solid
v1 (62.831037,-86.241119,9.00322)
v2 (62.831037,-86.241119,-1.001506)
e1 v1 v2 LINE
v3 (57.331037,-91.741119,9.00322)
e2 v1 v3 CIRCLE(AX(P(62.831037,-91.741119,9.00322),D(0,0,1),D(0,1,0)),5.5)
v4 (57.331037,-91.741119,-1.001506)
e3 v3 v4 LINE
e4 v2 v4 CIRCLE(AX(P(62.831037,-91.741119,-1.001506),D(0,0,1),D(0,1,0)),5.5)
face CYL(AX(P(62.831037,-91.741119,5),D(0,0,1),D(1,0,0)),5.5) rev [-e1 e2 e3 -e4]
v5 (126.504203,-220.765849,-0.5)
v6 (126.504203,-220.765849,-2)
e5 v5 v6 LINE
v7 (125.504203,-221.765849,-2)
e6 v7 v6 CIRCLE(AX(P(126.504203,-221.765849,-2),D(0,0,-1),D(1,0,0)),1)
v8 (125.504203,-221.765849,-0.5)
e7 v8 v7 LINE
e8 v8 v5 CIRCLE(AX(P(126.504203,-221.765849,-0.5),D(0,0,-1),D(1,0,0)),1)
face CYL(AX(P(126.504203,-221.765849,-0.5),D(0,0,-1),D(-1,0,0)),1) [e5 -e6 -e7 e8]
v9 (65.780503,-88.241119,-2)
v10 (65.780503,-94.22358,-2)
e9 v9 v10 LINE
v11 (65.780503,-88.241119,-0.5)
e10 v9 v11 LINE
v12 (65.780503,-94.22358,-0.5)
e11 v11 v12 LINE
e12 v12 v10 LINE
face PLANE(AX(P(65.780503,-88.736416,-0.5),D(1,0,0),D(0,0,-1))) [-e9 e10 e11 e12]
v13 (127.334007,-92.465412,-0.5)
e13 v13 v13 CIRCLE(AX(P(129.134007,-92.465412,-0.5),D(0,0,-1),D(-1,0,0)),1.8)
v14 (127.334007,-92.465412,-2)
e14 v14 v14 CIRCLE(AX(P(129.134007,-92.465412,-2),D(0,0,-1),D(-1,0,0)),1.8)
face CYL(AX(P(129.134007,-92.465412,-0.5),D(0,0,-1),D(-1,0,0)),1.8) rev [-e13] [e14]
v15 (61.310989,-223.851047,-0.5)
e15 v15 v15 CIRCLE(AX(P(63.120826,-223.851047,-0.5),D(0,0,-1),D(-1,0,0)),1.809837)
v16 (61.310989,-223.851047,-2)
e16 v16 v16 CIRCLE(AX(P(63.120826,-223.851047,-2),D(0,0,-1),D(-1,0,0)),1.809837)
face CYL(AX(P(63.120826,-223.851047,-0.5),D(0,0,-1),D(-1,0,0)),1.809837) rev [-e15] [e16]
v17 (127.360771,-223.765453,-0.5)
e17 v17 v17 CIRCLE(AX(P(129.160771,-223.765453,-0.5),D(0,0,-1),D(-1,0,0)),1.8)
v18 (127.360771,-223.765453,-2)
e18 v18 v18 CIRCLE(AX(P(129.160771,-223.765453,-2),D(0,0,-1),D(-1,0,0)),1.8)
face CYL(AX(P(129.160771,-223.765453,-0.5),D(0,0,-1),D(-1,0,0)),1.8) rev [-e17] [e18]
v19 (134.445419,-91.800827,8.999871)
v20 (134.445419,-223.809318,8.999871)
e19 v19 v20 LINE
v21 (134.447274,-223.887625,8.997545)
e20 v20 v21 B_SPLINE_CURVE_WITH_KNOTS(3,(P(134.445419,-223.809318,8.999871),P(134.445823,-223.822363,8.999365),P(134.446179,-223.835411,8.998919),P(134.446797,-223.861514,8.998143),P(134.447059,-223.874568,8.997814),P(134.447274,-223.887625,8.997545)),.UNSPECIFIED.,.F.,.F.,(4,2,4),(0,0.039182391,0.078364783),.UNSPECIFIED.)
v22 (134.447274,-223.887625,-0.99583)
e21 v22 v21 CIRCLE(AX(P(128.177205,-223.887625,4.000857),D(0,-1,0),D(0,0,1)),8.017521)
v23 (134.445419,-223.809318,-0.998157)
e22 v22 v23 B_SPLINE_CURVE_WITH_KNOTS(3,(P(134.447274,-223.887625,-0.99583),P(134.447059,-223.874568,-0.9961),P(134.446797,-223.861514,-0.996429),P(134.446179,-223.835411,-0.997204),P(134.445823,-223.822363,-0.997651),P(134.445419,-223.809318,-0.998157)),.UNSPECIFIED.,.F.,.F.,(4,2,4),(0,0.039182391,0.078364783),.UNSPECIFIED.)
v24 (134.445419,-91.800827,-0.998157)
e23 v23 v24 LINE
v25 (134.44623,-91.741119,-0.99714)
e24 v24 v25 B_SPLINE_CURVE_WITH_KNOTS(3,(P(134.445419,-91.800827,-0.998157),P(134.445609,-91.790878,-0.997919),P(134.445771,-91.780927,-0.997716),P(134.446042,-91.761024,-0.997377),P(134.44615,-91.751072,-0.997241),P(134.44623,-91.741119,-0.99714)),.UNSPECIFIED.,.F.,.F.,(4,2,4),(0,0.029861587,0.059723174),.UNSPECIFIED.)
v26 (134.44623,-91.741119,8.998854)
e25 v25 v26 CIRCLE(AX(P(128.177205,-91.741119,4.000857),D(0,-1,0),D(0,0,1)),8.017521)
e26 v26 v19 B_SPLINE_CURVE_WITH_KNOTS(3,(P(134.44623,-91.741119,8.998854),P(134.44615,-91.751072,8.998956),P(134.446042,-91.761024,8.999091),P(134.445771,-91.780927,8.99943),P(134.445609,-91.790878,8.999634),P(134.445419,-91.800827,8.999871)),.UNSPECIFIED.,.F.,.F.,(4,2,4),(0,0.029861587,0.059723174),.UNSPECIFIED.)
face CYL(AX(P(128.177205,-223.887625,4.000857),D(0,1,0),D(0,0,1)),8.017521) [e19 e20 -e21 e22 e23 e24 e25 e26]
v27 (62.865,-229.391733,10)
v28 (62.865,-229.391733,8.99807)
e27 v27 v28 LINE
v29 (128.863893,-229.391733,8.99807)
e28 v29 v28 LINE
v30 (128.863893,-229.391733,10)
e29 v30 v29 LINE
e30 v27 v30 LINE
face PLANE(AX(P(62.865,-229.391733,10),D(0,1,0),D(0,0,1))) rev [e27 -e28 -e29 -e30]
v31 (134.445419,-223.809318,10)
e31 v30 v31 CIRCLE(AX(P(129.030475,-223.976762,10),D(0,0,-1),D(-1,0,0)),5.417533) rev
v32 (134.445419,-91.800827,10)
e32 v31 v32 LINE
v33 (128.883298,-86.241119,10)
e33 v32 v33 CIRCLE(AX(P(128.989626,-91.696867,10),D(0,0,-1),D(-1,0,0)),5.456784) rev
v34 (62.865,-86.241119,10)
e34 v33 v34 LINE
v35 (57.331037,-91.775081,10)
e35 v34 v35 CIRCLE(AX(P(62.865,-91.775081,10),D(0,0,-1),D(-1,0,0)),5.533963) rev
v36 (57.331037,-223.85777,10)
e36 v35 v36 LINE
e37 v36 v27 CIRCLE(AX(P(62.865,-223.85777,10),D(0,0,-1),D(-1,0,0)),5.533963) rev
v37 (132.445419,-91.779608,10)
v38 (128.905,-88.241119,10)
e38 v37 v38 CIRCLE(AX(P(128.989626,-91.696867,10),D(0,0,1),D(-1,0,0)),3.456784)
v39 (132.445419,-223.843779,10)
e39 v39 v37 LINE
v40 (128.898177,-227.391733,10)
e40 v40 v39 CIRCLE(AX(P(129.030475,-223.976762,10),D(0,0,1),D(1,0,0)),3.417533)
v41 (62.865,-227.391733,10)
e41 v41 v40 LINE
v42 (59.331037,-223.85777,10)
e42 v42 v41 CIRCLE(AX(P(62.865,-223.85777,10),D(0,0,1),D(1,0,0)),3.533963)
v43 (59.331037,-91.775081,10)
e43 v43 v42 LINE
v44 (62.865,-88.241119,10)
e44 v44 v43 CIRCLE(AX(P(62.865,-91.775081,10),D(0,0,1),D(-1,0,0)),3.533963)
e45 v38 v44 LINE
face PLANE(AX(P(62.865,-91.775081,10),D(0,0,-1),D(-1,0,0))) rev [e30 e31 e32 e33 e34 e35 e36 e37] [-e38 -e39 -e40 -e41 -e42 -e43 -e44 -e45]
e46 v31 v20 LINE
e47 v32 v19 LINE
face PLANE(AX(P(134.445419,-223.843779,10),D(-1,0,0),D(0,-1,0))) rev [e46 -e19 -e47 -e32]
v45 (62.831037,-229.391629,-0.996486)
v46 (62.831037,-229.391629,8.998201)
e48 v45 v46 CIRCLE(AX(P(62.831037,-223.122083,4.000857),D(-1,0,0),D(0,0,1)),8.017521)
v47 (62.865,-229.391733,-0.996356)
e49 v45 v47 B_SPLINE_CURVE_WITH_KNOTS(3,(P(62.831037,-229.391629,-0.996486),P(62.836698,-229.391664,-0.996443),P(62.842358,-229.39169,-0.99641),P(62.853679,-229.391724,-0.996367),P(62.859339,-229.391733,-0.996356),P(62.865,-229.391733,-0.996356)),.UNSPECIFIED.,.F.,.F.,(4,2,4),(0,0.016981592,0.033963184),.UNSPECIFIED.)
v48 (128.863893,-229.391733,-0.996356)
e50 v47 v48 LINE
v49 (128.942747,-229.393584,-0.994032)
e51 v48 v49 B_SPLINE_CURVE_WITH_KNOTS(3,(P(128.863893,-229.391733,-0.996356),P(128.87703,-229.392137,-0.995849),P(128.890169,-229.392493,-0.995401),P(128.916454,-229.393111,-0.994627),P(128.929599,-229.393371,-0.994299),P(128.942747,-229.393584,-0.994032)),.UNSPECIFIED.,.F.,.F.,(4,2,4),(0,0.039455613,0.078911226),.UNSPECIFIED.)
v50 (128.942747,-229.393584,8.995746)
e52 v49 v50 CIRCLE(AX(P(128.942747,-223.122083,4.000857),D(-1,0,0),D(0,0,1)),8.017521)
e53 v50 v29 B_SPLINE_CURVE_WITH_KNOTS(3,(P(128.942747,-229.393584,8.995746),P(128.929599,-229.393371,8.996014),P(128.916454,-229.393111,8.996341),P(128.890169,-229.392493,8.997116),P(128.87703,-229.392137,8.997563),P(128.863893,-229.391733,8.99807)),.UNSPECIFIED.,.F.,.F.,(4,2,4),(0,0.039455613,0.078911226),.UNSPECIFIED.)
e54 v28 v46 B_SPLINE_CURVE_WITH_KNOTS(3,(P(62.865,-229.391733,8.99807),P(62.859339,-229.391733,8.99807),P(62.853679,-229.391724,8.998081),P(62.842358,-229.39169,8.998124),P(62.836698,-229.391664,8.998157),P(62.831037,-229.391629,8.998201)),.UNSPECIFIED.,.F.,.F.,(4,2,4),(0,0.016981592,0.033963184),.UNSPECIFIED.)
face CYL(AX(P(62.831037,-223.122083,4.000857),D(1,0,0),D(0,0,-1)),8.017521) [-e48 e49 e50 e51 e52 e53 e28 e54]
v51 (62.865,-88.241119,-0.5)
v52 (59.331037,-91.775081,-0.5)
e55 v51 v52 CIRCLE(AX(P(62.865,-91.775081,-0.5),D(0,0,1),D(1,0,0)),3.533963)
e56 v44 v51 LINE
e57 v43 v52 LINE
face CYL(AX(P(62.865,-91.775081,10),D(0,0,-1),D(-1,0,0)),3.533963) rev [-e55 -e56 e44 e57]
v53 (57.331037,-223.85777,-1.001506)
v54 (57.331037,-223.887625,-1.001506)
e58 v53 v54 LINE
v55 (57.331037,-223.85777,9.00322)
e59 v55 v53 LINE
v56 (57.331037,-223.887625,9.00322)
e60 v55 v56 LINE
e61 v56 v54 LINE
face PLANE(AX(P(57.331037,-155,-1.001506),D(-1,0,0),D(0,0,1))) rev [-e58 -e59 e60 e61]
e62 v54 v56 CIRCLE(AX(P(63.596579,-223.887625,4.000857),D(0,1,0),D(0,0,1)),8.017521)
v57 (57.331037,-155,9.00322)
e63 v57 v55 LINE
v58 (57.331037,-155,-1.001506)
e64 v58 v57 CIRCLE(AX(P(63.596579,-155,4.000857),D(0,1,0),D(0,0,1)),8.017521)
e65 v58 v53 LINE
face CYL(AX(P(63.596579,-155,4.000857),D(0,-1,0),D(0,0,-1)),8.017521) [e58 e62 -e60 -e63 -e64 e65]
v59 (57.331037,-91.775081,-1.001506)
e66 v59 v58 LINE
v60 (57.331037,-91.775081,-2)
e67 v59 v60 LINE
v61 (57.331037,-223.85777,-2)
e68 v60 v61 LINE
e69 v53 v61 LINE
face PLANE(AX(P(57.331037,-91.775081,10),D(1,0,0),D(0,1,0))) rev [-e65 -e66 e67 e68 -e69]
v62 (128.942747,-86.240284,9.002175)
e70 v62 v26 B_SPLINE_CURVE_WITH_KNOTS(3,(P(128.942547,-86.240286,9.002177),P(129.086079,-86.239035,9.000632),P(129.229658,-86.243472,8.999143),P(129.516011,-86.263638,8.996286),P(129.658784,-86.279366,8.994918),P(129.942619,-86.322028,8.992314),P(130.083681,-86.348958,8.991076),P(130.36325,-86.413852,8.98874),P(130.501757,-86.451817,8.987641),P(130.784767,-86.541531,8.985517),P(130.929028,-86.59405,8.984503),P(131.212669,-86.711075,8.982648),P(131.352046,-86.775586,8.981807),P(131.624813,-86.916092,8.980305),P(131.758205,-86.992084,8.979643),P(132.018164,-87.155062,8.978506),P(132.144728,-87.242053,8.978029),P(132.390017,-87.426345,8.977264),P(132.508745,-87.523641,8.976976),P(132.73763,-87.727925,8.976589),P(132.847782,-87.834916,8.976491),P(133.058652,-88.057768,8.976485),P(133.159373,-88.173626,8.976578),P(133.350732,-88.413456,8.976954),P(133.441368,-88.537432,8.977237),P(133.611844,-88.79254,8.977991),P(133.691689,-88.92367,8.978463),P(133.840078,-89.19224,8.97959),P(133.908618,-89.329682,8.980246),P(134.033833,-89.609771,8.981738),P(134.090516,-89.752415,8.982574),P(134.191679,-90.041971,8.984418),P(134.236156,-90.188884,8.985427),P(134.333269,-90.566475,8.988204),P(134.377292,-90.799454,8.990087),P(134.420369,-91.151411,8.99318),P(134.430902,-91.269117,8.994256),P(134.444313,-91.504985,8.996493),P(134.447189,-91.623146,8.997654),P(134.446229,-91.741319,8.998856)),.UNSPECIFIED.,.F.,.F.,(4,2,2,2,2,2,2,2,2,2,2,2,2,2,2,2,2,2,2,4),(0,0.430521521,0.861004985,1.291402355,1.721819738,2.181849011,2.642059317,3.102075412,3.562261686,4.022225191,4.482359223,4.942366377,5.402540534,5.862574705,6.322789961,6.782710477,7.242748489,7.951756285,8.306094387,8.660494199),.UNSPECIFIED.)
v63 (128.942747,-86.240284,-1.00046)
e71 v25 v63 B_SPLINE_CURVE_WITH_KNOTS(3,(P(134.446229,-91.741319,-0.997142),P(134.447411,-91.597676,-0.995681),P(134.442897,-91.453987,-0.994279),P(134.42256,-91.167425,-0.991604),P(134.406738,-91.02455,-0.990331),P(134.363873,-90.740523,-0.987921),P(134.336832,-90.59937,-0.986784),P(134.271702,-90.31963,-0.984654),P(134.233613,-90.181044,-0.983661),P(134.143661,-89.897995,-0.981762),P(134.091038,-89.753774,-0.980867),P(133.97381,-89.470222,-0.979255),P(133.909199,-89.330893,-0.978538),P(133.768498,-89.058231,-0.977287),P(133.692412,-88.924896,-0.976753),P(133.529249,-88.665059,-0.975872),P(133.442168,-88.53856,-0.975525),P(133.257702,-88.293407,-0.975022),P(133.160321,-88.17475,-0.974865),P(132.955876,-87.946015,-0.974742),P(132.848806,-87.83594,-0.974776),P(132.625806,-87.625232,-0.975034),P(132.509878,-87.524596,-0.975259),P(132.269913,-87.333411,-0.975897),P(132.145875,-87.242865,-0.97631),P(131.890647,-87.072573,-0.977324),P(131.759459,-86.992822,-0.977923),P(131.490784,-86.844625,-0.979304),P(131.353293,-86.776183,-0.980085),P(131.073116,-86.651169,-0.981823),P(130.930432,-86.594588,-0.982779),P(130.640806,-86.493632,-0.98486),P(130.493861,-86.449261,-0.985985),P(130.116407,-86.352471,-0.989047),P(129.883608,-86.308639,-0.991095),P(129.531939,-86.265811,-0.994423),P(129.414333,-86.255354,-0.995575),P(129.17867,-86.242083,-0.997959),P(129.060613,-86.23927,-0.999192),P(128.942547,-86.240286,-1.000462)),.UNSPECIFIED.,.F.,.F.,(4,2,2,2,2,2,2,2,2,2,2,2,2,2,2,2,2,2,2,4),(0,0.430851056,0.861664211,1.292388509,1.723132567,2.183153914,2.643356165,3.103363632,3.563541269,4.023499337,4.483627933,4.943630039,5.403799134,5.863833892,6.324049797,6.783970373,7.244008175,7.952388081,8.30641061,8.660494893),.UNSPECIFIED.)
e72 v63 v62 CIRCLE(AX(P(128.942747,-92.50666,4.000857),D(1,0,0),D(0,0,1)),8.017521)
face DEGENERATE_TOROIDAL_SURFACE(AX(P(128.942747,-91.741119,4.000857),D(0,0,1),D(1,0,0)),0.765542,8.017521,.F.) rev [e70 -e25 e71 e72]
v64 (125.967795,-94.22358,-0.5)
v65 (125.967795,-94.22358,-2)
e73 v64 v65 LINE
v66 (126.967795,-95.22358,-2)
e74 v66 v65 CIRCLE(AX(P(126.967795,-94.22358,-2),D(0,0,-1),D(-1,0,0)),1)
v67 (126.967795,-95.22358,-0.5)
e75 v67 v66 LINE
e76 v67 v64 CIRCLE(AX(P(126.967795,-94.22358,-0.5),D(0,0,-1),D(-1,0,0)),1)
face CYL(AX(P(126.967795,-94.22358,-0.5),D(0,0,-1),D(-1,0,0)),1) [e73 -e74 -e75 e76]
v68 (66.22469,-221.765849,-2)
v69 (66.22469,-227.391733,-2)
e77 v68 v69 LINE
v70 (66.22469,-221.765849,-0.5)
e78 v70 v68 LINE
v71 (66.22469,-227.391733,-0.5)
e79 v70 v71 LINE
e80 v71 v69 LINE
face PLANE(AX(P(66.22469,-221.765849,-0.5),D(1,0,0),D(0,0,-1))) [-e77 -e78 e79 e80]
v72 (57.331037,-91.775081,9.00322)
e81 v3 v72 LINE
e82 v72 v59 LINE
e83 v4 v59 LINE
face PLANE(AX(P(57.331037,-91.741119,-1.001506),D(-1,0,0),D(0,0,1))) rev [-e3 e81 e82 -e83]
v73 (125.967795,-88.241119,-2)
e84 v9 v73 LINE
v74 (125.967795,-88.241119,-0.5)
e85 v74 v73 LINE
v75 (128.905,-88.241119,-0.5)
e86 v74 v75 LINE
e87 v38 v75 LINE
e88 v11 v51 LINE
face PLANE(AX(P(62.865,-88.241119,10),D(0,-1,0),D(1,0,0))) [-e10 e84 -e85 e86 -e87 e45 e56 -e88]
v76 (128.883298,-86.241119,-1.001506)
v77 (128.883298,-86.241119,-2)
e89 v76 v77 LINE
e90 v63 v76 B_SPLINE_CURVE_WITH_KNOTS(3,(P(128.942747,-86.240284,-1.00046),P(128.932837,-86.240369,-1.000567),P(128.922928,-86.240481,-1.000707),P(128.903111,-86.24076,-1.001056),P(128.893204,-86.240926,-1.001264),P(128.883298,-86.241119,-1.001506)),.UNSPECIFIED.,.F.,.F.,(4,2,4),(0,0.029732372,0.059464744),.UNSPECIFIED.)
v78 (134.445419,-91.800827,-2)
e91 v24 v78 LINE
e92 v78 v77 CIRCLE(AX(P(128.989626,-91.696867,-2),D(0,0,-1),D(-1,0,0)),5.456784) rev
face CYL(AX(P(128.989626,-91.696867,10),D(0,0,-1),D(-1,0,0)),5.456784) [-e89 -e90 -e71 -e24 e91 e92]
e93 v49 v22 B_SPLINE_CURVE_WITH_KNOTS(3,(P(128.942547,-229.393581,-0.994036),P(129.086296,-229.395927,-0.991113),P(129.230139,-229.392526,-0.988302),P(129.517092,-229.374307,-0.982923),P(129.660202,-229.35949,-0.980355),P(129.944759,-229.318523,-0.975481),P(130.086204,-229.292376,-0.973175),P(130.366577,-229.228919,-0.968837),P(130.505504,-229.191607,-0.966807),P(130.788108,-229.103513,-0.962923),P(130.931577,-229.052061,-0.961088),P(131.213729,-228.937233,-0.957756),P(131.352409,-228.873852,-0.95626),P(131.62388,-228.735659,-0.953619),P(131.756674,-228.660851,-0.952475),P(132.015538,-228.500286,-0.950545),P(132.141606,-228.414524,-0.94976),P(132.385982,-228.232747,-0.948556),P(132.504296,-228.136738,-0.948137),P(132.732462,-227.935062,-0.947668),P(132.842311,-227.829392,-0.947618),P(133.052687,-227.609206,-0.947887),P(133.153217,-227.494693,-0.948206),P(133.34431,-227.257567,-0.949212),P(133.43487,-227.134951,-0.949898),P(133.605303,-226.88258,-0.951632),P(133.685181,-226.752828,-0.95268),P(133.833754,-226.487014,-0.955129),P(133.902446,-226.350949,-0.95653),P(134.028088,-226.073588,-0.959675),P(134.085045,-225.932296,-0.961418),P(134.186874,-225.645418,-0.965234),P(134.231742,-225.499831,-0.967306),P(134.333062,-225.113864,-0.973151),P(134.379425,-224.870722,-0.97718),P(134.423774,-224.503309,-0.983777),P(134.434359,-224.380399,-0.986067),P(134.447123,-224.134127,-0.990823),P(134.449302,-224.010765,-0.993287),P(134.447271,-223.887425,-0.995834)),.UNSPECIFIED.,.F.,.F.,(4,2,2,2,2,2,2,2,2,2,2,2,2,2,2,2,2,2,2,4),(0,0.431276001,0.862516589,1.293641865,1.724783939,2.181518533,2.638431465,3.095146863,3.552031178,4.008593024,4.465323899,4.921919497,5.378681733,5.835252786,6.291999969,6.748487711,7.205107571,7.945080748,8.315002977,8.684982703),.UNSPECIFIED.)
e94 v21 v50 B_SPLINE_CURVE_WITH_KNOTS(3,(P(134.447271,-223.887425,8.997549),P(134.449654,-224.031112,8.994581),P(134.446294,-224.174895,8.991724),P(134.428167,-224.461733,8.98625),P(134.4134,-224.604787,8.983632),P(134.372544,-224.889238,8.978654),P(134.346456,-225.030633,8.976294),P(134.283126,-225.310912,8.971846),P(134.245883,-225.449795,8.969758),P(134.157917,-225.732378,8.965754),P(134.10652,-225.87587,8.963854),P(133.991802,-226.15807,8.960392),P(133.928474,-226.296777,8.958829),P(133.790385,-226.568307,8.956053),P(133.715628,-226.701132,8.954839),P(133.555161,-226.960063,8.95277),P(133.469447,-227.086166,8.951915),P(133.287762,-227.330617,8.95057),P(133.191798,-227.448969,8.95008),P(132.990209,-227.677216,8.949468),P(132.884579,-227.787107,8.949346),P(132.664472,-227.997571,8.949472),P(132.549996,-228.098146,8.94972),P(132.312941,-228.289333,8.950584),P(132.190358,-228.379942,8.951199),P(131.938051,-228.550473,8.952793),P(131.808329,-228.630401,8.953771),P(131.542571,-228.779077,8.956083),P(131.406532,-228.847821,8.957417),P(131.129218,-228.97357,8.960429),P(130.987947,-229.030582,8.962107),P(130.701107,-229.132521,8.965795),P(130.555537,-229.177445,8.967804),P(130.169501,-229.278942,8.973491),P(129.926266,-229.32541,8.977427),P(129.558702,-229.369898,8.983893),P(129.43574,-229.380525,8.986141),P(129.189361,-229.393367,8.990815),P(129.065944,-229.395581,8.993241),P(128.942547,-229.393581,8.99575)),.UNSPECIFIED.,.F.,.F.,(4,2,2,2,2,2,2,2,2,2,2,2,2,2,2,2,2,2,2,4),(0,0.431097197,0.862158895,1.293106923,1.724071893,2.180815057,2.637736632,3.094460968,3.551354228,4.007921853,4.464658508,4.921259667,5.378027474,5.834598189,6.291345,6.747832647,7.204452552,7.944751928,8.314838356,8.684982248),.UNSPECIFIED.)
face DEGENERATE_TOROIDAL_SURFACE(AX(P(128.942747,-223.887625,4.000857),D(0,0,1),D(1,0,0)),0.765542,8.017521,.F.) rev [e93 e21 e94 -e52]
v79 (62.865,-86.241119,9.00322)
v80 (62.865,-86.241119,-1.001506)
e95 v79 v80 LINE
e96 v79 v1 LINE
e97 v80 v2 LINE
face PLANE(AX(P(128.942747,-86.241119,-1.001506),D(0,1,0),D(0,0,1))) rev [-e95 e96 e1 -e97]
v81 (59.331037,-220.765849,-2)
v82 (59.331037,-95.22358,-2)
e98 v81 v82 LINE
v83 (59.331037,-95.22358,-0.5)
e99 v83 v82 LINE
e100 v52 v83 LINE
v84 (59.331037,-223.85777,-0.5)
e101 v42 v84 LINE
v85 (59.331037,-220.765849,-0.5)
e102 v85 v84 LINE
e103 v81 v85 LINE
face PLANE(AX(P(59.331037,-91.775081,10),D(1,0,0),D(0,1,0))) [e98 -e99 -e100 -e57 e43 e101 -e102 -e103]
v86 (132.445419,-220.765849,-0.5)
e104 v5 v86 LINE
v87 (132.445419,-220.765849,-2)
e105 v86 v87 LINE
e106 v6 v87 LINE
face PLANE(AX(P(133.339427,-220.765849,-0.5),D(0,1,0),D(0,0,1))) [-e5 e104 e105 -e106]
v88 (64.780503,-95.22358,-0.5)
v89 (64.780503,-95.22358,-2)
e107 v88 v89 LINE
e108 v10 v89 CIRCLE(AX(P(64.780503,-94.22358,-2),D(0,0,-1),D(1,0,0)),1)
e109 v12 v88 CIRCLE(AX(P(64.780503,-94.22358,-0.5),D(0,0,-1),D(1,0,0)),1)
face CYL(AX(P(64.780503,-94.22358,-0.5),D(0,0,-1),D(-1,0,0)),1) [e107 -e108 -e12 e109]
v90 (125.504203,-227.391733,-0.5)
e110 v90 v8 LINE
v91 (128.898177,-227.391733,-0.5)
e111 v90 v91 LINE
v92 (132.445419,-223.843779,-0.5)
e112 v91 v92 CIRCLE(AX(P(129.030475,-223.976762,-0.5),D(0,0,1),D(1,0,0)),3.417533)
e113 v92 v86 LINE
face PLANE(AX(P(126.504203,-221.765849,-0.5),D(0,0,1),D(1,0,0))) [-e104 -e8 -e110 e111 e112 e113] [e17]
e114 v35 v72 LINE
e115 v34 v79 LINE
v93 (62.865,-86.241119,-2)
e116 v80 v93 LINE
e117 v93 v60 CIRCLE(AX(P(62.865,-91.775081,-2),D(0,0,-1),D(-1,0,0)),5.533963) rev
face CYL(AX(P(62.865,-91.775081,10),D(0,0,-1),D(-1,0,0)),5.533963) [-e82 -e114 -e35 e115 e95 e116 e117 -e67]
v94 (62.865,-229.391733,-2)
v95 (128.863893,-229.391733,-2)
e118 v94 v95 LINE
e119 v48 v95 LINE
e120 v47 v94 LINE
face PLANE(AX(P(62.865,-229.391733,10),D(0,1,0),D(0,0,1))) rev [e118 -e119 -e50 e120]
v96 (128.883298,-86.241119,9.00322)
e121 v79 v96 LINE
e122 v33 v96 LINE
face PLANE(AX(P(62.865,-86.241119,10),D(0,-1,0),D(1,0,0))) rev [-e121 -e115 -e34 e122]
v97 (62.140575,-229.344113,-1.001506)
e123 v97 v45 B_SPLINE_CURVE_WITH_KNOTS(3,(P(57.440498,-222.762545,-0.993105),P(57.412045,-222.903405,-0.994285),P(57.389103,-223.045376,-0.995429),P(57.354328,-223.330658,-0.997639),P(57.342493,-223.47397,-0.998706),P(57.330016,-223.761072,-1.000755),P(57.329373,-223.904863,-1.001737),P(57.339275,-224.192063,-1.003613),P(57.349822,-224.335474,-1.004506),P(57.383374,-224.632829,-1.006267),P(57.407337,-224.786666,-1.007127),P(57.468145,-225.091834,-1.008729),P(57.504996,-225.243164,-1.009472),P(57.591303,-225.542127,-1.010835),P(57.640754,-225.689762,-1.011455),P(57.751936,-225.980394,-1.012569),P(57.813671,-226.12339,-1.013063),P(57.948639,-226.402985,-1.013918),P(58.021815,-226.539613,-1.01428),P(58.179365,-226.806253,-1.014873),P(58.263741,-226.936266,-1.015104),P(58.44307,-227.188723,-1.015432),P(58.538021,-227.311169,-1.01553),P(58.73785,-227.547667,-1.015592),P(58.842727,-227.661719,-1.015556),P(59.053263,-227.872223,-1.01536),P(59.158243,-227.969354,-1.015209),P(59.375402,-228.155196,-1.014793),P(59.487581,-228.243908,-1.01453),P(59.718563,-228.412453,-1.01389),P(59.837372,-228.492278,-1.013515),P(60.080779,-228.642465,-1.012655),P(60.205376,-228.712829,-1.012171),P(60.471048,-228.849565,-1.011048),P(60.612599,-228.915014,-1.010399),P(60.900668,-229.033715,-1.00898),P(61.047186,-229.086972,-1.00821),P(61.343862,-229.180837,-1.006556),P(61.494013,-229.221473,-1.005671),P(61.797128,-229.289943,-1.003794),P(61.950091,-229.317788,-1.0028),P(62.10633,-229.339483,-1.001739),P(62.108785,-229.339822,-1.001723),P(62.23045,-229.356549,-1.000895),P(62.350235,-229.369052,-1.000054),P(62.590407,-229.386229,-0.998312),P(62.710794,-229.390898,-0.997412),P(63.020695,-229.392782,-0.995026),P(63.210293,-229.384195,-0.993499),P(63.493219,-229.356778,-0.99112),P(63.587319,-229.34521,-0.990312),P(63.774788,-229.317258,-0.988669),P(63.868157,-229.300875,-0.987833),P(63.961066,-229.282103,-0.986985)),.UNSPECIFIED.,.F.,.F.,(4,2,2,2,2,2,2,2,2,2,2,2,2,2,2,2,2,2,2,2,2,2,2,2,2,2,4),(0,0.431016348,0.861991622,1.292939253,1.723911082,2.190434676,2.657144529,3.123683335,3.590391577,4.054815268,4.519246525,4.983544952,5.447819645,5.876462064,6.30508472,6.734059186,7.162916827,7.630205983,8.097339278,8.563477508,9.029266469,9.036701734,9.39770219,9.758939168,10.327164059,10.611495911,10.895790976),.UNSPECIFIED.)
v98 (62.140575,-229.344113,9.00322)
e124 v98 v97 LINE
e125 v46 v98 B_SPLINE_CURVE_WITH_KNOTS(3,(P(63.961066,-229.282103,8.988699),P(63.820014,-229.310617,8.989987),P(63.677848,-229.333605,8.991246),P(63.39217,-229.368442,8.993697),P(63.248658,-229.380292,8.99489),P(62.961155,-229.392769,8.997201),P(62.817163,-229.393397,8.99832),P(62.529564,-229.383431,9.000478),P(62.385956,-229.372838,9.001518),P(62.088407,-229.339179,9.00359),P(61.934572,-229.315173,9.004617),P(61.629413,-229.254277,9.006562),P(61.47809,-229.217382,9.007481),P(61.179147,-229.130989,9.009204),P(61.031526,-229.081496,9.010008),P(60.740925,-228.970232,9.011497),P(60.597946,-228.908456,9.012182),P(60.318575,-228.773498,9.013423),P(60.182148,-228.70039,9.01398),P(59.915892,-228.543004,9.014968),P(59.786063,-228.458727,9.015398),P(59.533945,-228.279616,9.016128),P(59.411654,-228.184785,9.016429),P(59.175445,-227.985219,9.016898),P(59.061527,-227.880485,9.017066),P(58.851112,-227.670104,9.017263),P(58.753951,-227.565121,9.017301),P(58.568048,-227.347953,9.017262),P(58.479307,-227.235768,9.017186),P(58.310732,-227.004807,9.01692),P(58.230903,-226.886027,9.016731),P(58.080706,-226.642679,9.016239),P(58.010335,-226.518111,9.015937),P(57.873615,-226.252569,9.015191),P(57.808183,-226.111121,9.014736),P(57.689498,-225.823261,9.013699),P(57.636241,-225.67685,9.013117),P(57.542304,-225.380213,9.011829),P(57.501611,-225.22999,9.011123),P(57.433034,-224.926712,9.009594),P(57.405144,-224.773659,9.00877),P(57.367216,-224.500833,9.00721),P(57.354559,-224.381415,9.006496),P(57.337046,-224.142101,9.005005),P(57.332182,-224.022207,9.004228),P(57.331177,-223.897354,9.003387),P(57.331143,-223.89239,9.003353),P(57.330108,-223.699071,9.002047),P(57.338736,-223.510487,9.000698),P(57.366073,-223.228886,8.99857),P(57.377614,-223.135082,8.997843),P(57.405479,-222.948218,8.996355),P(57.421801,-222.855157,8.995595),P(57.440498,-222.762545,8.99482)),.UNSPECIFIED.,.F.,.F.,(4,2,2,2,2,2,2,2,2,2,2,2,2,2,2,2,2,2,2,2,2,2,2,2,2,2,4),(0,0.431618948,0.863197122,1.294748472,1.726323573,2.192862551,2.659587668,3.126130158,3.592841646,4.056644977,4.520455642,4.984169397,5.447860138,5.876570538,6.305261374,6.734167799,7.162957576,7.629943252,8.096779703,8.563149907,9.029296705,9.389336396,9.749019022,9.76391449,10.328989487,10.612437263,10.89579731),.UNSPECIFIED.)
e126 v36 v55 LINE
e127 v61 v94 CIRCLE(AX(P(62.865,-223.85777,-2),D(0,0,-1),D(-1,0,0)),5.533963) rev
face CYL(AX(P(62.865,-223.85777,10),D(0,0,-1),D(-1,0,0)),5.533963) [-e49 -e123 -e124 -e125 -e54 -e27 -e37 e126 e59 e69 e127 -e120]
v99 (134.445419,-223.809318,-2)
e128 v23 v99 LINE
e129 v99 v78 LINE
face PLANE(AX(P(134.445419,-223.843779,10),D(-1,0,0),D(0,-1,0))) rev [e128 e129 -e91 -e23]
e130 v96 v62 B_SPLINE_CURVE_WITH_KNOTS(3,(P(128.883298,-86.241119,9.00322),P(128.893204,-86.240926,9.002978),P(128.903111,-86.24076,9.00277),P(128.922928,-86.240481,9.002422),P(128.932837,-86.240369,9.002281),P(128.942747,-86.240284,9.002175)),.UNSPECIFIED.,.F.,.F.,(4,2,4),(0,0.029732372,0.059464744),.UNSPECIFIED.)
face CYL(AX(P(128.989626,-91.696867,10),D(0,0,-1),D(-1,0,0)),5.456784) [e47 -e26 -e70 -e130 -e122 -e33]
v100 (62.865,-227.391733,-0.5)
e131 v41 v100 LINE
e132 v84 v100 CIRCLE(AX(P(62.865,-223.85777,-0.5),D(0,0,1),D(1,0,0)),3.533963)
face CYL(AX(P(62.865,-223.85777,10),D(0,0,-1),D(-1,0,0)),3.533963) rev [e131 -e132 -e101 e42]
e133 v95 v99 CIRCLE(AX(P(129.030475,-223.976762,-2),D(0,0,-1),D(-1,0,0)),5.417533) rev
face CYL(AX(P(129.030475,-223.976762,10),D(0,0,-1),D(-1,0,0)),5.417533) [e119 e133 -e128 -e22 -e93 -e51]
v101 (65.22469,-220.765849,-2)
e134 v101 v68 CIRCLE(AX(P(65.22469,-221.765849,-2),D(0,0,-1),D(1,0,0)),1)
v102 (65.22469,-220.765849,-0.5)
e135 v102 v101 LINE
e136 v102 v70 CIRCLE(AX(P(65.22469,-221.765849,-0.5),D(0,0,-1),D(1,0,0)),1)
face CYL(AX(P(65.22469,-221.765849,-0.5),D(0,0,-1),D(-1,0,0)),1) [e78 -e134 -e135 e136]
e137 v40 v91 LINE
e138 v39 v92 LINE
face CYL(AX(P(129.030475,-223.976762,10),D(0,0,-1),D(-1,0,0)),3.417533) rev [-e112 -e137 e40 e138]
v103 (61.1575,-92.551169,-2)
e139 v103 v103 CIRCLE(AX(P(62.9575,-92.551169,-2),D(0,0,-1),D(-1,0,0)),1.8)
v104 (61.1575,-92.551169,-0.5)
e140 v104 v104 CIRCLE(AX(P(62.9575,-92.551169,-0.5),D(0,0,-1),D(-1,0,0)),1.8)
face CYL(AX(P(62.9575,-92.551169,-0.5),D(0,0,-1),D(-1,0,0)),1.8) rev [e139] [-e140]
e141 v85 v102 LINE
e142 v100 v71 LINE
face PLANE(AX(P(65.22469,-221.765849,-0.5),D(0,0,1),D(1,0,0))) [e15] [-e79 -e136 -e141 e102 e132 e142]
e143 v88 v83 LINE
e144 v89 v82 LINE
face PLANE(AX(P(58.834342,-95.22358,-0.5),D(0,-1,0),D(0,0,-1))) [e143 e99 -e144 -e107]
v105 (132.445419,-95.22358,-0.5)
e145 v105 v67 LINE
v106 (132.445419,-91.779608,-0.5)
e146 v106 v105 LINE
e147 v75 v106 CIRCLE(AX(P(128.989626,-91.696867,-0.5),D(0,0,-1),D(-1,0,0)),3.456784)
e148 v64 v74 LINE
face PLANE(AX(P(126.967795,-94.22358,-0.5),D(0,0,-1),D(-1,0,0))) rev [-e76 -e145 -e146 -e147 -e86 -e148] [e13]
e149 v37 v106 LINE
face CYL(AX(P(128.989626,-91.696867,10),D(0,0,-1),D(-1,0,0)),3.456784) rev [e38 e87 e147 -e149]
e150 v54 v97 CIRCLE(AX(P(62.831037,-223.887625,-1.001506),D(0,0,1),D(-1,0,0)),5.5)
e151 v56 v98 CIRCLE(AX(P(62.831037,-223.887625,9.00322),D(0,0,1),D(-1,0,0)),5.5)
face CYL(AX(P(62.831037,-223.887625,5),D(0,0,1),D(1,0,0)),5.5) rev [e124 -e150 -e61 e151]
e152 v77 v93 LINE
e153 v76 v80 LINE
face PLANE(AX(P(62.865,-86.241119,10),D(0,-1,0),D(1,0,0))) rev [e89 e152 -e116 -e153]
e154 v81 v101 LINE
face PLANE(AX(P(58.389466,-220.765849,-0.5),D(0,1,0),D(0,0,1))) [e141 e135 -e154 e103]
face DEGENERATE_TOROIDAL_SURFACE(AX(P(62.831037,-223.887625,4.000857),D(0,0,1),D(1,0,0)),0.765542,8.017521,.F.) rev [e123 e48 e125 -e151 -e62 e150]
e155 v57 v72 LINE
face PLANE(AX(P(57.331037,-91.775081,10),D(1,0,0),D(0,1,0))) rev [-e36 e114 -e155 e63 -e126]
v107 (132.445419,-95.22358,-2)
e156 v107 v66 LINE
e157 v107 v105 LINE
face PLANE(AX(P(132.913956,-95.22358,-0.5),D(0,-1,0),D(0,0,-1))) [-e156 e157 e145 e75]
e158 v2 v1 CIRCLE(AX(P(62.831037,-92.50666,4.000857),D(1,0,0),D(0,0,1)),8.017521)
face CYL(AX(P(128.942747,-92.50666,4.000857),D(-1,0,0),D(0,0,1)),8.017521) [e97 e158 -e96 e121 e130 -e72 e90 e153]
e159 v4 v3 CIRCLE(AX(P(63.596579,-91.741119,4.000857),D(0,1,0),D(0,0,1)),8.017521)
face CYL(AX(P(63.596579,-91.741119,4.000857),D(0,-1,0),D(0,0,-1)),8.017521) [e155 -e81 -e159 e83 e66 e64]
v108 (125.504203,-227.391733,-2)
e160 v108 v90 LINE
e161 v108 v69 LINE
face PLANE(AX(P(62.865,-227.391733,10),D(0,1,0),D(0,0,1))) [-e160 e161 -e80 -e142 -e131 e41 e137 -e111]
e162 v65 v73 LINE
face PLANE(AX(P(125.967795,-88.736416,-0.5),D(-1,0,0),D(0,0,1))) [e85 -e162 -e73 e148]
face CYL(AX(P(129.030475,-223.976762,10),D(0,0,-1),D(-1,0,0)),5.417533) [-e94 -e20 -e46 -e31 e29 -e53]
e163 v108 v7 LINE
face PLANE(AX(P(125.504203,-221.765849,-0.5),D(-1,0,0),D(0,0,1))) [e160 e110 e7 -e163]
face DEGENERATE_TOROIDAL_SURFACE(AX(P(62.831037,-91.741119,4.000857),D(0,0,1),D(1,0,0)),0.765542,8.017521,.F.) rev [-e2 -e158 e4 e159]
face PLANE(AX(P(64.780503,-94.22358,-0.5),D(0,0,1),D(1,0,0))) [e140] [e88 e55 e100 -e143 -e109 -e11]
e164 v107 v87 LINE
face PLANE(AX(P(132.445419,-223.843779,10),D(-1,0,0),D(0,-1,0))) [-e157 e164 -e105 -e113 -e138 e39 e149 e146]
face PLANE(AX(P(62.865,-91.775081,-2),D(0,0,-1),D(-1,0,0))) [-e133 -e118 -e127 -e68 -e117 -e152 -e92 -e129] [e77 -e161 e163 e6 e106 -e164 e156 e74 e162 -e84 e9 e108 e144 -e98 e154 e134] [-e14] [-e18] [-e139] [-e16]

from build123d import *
from build123d.topology import SkipClean

# Parameters (mm, degrees)
BOSS_EXTRU_1_DEPTH      = 10
COQUE3_START            = 62.865
COQUE3_OUTLINE_W        = 139.150614233
COQUE3_OUTLINE_H        = 10
COQUE3_DEPTH            = 66.018297978
COQUE3_2_DEPTH          = 66.018297978
COQUE3_START_2          = 132.445419336
COQUE3_3_OUTLINE_W      = 139.150614233
COQUE3_3_OUTLINE_H      = 10
COQUE3_3_DEPTH          = 0.002588282
COQUE3_4_DEPTH          = 10
COQUE3_START_3          = -2
COQUE3_5_DEPTH          = 12
COQUE3_6_DEPTH          = 2
ENL_V_START             = -10
ENL_V_MAT_EXTRU_4_DEPTH = 10
ESQUISSE5_R             = 1.8
BOSS_EXTRU_2_DEPTH      = 1.5
ESQUISSE6_R             = 1.8
ESQUISSE6_R_2           = 1.809836942
BOSS_EXTRU_3_DEPTH      = 1.5


with BuildPart() as part:
    # Model → Boss.-Extru.1 (new body)
    with BuildSketch(Plane.XY):
        with BuildLine():
            Line((62.865, -88.241118767), (128.905, -88.241118767))
            ThreePointArc((128.905, -88.241118767), (131.433274754, -89.251885129), (132.445419336, -91.779608456))
            Line((132.445419336, -91.779608456), (132.445419336, -223.843779))
            ThreePointArc((132.445419336, -223.843779), (131.447277728, -226.393080044), (128.898176953, -227.391733))
            Line((128.898176953, -227.391733), (62.865, -227.391733))
            ThreePointArc((62.865, -227.391733), (60.366111032, -226.356659298), (59.33103733, -223.85777033))
            Line((59.33103733, -223.85777033), (59.33103733, -91.775081437))
            ThreePointArc((59.33103733, -91.775081437), (60.366111032, -89.276192468), (62.865, -88.241118767))
        make_face()
    extrude(amount=BOSS_EXTRU_1_DEPTH)

    # Coque3: read off the stored shape, not the designer's step
    # Coque3 outline → Coque3 (cut)
    with BuildSketch(Plane.YZ.offset(COQUE3_START)):
        with Locations((-157.816425884, 5)):
            Rectangle(COQUE3_OUTLINE_W, COQUE3_OUTLINE_H)
    extrude(amount=COQUE3_DEPTH, mode=Mode.SUBTRACT)

    # Coque3 2 outline → Coque3 2 (add)
    with BuildSketch(Plane.YZ.offset(COQUE3_START)):
        Polygon((-227.391733, 10), (-229.391733, 10), (-229.391733, -2), (-86.241118767, -2), (-86.241118767, 10), (-88.241118767, 10), (-88.241118767, 0), (-227.391733, 0), align=None)
    extrude(amount=COQUE3_2_DEPTH)

    # Coque3 3 outline → Coque3 3 (add)
    with BuildSketch(Plane.YZ.offset(COQUE3_START_2)):
        with Locations((-157.816425884, 5)):
            Rectangle(COQUE3_3_OUTLINE_W, COQUE3_3_OUTLINE_H)
    extrude(amount=COQUE3_3_DEPTH)

    # Coque3 4 outline → Coque3 4 (cut)
    with BuildSketch(Plane.XY):
        with BuildLine():
            Line((62.865, -227.391733), (62.865, -88.241118767))
            ThreePointArc((62.865, -88.241118767), (60.366111032, -89.276192468), (59.33103733, -91.775081437))
            Line((59.33103733, -91.775081437), (59.33103733, -223.85777033))
            ThreePointArc((59.33103733, -223.85777033), (60.366111032, -226.356659298), (62.865, -227.391733))
        make_face()
        with BuildLine():
            Line((128.905, -88.241118767), (128.883297978, -88.241118767))
            Line((128.883297978, -88.241118767), (128.883297978, -227.391733))
            Line((128.883297978, -227.391733), (128.898176953, -227.391733))
            ThreePointArc((128.898176953, -227.391733), (131.447277728, -226.393080044), (132.445419336, -223.843779))
            Line((132.445419336, -223.843779), (132.445419336, -91.779608456))
            ThreePointArc((132.445419336, -91.779608456), (131.433274754, -89.251885129), (128.905, -88.241118767))
        make_face()
    extrude(amount=COQUE3_4_DEPTH, mode=Mode.SUBTRACT)

    # Coque3 5 outline → Coque3 5 (add)
    with SkipClean():  # the faces are left unmerged after this step: merging them gives an invalid solid
        with BuildSketch(Plane.XY.offset(COQUE3_START_3)):
            with BuildLine():
                ThreePointArc((62.865, -86.241118767), (58.951897469, -87.861978906), (57.33103733, -91.775081437))
                Line((57.33103733, -91.775081437), (57.33103733, -223.85777033))
                ThreePointArc((57.33103733, -223.85777033), (58.951897469, -227.770872861), (62.865, -229.391733))
                Line((62.865, -229.391733), (62.865, -227.391733))
                ThreePointArc((62.865, -227.391733), (60.366111032, -226.356659298), (59.33103733, -223.85777033))
                Line((59.33103733, -223.85777033), (59.33103733, -91.775081437))
                ThreePointArc((59.33103733, -91.775081437), (60.366111032, -89.276192468), (62.865, -88.241118767))
                Line((62.865, -88.241118767), (62.865, -86.241118767))
            make_face()
            with BuildLine():
                Line((128.883297978, -86.241118767), (128.883297978, -88.241118767))
                Line((128.883297978, -88.241118767), (128.905, -88.241118767))
                ThreePointArc((128.905, -88.241118767), (131.433274754, -89.251885129), (132.445419336, -91.779608456))
                Line((132.445419336, -91.779608456), (132.445419336, -223.843779))
                ThreePointArc((132.445419336, -223.843779), (131.447277728, -226.393080044), (128.898176953, -227.391733))
                Line((128.898176953, -227.391733), (128.883297978, -227.391733))
                Line((128.883297978, -227.391733), (128.883297978, -229.391733))
                Line((128.883297978, -229.391733), (128.863893168, -229.391733))
                ThreePointArc((128.863893168, -229.391733), (132.861554056, -227.807230841), (134.445419336, -223.80931758))
                Line((134.445419336, -223.80931758), (134.445419336, -91.8008272))
                ThreePointArc((134.445419336, -91.8008272), (132.847317492, -87.837500742), (128.883297978, -86.241118767))
            make_face()
        extrude(amount=COQUE3_5_DEPTH)
    add(part.part.scale(1), mode=Mode.REPLACE)  # the faces are merged on a copy

    # Coque3 6 outline → Coque3 6 (add)
    with BuildSketch(Plane.XY.offset(COQUE3_START_3)):
        with BuildLine():
            Line((62.865, -227.391733), (62.865, -88.241118767))
            ThreePointArc((62.865, -88.241118767), (60.366111032, -89.276192468), (59.33103733, -91.775081437))
            Line((59.33103733, -91.775081437), (59.33103733, -223.85777033))
            ThreePointArc((59.33103733, -223.85777033), (60.366111032, -226.356659298), (62.865, -227.391733))
        make_face()
        with BuildLine():
            Line((128.905, -88.241118767), (128.883297978, -88.241118767))
            Line((128.883297978, -88.241118767), (128.883297978, -227.391733))
            Line((128.883297978, -227.391733), (128.898176953, -227.391733))
            ThreePointArc((128.898176953, -227.391733), (131.447277728, -226.393080044), (132.445419336, -223.843779))
            Line((132.445419336, -223.843779), (132.445419336, -91.779608456))
            ThreePointArc((132.445419336, -91.779608456), (131.433274754, -89.251885129), (128.905, -88.241118767))
        make_face()
    extrude(amount=COQUE3_6_DEPTH)

    # Esquisse3 → Enlèv. mat.-Extru.4 (cut)
    with BuildSketch(Plane.XY.offset(ENL_V_START)):
        with BuildLine():
            Line((62.865, -88.241118767), (128.905, -88.241118767))
            ThreePointArc((128.905, -88.241118767), (131.433274754, -89.251885129), (132.445419336, -91.779608456))
            Line((132.445419336, -91.779608456), (132.445419336, -223.843779))
            ThreePointArc((132.445419336, -223.843779), (131.447277728, -226.393080044), (128.898176953, -227.391733))
            Line((128.898176953, -227.391733), (62.865, -227.391733))
            ThreePointArc((62.865, -227.391733), (60.366111032, -226.356659298), (59.33103733, -223.85777033))
            Line((59.33103733, -223.85777033), (59.33103733, -91.775081437))
            ThreePointArc((59.33103733, -91.775081437), (60.366111032, -89.276192468), (62.865, -88.241118767))
        make_face()
    extrude(amount=ENL_V_MAT_EXTRU_4_DEPTH, mode=Mode.SUBTRACT)

    # Esquisse5 → Boss.-Extru.2 (add)
    # profile 1 of 2: a face of its own
    with SkipClean():  # the faces are left unmerged after this step: merging them gives an invalid solid
        with BuildSketch(Plane(origin=(0, 0, -2), x_dir=(-1, 0, 0), z_dir=(0, 0, -1))):
            with BuildLine():
                Line((-125.967795303, -88.736416121), (-125.967795303, -87.927030419))
                Line((-125.967795303, -87.927030419), (-130.489542498, -87.7228715))
                Line((-130.489542498, -87.7228715), (-132.246258772, -88.33172327))
                Line((-132.246258772, -88.33172327), (-132.913956121, -88.736416121))
                Line((-132.913956121, -88.736416121), (-132.913956121, -95.223579528))
                Line((-132.913956121, -95.223579528), (-126.967795303, -95.223579528))
                ThreePointArc((-126.967795303, -95.223579528), (-126.260688522, -94.93068631), (-125.967795303, -94.223579528))
                Line((-125.967795303, -94.223579528), (-125.967795303, -88.736416121))
            make_face()
            with Locations((-129.134006805, -92.465411844)):
                Circle(ESQUISSE5_R, mode=Mode.SUBTRACT)
        # profile 2 of 2: a face of its own
        with BuildSketch(Plane(origin=(0, 0, -2), x_dir=(-1, 0, 0), z_dir=(0, 0, -1))):
            with BuildLine():
                Line((-65.780502675, -88.736416121), (-65.780502675, -87.927030419))
                Line((-65.780502675, -87.927030419), (-61.258755481, -87.7228715))
                Line((-61.258755481, -87.7228715), (-59.502039206, -88.33172327))
                Line((-59.502039206, -88.33172327), (-58.834341857, -88.736416121))
                Line((-58.834341857, -88.736416121), (-58.834341857, -95.223579528))
                Line((-58.834341857, -95.223579528), (-64.780502675, -95.223579528))
                ThreePointArc((-64.780502675, -95.223579528), (-65.487609456, -94.93068631), (-65.780502675, -94.223579528))
                Line((-65.780502675, -94.223579528), (-65.780502675, -88.736416121))
            make_face()
            with Locations((-62.957500414, -92.551168532)):
                Circle(ESQUISSE5_R, mode=Mode.SUBTRACT)
        extrude(amount=-BOSS_EXTRU_2_DEPTH)

    # Esquisse6 → Boss.-Extru.3 (add)
    # profile 1 of 2: a face of its own
    with BuildSketch(Plane(origin=(0, 0, -2), x_dir=(-1, 0, 0), z_dir=(0, 0, -1))):
        with BuildLine():
            Line((-133.339427004, -220.765848966), (-126.504202764, -220.765848966))
            ThreePointArc((-126.504202764, -220.765848966), (-125.797095983, -221.058742184), (-125.504202764, -221.765848966))
            Line((-125.504202764, -221.765848966), (-125.504202764, -228.064085465))
            Line((-125.504202764, -228.064085465), (-130.16804847, -228.064085465))
            Line((-130.16804847, -228.064085465), (-131.733408387, -227.250911482))
            Line((-131.733408387, -227.250911482), (-133.339427004, -225.177317824))
            Line((-133.339427004, -225.177317824), (-133.339427004, -220.765848966))
        make_face()
        with Locations((-129.160770539, -223.765453407)):
            Circle(ESQUISSE6_R, mode=Mode.SUBTRACT)
    # profile 2 of 2: a face of its own
    with BuildSketch(Plane(origin=(0, 0, -2), x_dir=(-1, 0, 0), z_dir=(0, 0, -1))):
        with BuildLine():
            Line((-58.389466164, -225.177317824), (-58.389466164, -220.765848966))
            Line((-58.389466164, -220.765848966), (-65.224690404, -220.765848966))
            ThreePointArc((-65.224690404, -220.765848966), (-65.931797185, -221.058742184), (-66.224690404, -221.765848966))
            Line((-66.224690404, -221.765848966), (-66.224690404, -228.064085465))
            Line((-66.224690404, -228.064085465), (-61.560844698, -228.064085465))
            Line((-61.560844698, -228.064085465), (-59.995484781, -227.250911482))
            Line((-59.995484781, -227.250911482), (-58.389466164, -225.177317824))
        make_face()
        with Locations((-63.12082636, -223.851047054)):
            Circle(ESQUISSE6_R_2, mode=Mode.SUBTRACT)
    extrude(amount=-BOSS_EXTRU_3_DEPTH)

    # Balayage1: sweep along a path in Esquisse7
    with BuildLine(Plane.XY.offset(5)) as balayage1_path:
        Line((128.942747104, -230.887624532), (62.83103733, -230.887624532))
        ThreePointArc((62.83103733, -230.887624532), (57.881289862, -228.837372001), (55.83103733, -223.887624532))
        Line((55.83103733, -223.887624532), (55.83103733, -91.741118767))
        ThreePointArc((55.83103733, -91.741118767), (57.881289862, -86.791371299), (62.83103733, -84.741118767))
        Line((62.83103733, -84.741118767), (128.942747104, -84.741118767))
        ThreePointArc((128.942747104, -84.741118767), (133.892494572, -86.791371299), (135.942747104, -91.741118767))
        Line((135.942747104, -91.741118767), (135.942747104, -223.887624532))
        ThreePointArc((135.942747104, -223.887624532), (133.892494572, -228.837372001), (128.942747104, -230.887624532))
    # Esquisse8 → Balayage1 (sweep)
    with BuildSketch(Plane(origin=(0, -155, 0), x_dir=(1, 0, 0), z_dir=(0, 1, 0))):
        with BuildLine():
            Line((57.33103733, 1.001505866), (57.33103733, -9.003220236))
            ThreePointArc((57.33103733, -9.003220236), (55.579057649, -4.000857185), (57.33103733, 1.001505866))
        make_face()
    sweep(path=balayage1_path.line)


solid = part.part
